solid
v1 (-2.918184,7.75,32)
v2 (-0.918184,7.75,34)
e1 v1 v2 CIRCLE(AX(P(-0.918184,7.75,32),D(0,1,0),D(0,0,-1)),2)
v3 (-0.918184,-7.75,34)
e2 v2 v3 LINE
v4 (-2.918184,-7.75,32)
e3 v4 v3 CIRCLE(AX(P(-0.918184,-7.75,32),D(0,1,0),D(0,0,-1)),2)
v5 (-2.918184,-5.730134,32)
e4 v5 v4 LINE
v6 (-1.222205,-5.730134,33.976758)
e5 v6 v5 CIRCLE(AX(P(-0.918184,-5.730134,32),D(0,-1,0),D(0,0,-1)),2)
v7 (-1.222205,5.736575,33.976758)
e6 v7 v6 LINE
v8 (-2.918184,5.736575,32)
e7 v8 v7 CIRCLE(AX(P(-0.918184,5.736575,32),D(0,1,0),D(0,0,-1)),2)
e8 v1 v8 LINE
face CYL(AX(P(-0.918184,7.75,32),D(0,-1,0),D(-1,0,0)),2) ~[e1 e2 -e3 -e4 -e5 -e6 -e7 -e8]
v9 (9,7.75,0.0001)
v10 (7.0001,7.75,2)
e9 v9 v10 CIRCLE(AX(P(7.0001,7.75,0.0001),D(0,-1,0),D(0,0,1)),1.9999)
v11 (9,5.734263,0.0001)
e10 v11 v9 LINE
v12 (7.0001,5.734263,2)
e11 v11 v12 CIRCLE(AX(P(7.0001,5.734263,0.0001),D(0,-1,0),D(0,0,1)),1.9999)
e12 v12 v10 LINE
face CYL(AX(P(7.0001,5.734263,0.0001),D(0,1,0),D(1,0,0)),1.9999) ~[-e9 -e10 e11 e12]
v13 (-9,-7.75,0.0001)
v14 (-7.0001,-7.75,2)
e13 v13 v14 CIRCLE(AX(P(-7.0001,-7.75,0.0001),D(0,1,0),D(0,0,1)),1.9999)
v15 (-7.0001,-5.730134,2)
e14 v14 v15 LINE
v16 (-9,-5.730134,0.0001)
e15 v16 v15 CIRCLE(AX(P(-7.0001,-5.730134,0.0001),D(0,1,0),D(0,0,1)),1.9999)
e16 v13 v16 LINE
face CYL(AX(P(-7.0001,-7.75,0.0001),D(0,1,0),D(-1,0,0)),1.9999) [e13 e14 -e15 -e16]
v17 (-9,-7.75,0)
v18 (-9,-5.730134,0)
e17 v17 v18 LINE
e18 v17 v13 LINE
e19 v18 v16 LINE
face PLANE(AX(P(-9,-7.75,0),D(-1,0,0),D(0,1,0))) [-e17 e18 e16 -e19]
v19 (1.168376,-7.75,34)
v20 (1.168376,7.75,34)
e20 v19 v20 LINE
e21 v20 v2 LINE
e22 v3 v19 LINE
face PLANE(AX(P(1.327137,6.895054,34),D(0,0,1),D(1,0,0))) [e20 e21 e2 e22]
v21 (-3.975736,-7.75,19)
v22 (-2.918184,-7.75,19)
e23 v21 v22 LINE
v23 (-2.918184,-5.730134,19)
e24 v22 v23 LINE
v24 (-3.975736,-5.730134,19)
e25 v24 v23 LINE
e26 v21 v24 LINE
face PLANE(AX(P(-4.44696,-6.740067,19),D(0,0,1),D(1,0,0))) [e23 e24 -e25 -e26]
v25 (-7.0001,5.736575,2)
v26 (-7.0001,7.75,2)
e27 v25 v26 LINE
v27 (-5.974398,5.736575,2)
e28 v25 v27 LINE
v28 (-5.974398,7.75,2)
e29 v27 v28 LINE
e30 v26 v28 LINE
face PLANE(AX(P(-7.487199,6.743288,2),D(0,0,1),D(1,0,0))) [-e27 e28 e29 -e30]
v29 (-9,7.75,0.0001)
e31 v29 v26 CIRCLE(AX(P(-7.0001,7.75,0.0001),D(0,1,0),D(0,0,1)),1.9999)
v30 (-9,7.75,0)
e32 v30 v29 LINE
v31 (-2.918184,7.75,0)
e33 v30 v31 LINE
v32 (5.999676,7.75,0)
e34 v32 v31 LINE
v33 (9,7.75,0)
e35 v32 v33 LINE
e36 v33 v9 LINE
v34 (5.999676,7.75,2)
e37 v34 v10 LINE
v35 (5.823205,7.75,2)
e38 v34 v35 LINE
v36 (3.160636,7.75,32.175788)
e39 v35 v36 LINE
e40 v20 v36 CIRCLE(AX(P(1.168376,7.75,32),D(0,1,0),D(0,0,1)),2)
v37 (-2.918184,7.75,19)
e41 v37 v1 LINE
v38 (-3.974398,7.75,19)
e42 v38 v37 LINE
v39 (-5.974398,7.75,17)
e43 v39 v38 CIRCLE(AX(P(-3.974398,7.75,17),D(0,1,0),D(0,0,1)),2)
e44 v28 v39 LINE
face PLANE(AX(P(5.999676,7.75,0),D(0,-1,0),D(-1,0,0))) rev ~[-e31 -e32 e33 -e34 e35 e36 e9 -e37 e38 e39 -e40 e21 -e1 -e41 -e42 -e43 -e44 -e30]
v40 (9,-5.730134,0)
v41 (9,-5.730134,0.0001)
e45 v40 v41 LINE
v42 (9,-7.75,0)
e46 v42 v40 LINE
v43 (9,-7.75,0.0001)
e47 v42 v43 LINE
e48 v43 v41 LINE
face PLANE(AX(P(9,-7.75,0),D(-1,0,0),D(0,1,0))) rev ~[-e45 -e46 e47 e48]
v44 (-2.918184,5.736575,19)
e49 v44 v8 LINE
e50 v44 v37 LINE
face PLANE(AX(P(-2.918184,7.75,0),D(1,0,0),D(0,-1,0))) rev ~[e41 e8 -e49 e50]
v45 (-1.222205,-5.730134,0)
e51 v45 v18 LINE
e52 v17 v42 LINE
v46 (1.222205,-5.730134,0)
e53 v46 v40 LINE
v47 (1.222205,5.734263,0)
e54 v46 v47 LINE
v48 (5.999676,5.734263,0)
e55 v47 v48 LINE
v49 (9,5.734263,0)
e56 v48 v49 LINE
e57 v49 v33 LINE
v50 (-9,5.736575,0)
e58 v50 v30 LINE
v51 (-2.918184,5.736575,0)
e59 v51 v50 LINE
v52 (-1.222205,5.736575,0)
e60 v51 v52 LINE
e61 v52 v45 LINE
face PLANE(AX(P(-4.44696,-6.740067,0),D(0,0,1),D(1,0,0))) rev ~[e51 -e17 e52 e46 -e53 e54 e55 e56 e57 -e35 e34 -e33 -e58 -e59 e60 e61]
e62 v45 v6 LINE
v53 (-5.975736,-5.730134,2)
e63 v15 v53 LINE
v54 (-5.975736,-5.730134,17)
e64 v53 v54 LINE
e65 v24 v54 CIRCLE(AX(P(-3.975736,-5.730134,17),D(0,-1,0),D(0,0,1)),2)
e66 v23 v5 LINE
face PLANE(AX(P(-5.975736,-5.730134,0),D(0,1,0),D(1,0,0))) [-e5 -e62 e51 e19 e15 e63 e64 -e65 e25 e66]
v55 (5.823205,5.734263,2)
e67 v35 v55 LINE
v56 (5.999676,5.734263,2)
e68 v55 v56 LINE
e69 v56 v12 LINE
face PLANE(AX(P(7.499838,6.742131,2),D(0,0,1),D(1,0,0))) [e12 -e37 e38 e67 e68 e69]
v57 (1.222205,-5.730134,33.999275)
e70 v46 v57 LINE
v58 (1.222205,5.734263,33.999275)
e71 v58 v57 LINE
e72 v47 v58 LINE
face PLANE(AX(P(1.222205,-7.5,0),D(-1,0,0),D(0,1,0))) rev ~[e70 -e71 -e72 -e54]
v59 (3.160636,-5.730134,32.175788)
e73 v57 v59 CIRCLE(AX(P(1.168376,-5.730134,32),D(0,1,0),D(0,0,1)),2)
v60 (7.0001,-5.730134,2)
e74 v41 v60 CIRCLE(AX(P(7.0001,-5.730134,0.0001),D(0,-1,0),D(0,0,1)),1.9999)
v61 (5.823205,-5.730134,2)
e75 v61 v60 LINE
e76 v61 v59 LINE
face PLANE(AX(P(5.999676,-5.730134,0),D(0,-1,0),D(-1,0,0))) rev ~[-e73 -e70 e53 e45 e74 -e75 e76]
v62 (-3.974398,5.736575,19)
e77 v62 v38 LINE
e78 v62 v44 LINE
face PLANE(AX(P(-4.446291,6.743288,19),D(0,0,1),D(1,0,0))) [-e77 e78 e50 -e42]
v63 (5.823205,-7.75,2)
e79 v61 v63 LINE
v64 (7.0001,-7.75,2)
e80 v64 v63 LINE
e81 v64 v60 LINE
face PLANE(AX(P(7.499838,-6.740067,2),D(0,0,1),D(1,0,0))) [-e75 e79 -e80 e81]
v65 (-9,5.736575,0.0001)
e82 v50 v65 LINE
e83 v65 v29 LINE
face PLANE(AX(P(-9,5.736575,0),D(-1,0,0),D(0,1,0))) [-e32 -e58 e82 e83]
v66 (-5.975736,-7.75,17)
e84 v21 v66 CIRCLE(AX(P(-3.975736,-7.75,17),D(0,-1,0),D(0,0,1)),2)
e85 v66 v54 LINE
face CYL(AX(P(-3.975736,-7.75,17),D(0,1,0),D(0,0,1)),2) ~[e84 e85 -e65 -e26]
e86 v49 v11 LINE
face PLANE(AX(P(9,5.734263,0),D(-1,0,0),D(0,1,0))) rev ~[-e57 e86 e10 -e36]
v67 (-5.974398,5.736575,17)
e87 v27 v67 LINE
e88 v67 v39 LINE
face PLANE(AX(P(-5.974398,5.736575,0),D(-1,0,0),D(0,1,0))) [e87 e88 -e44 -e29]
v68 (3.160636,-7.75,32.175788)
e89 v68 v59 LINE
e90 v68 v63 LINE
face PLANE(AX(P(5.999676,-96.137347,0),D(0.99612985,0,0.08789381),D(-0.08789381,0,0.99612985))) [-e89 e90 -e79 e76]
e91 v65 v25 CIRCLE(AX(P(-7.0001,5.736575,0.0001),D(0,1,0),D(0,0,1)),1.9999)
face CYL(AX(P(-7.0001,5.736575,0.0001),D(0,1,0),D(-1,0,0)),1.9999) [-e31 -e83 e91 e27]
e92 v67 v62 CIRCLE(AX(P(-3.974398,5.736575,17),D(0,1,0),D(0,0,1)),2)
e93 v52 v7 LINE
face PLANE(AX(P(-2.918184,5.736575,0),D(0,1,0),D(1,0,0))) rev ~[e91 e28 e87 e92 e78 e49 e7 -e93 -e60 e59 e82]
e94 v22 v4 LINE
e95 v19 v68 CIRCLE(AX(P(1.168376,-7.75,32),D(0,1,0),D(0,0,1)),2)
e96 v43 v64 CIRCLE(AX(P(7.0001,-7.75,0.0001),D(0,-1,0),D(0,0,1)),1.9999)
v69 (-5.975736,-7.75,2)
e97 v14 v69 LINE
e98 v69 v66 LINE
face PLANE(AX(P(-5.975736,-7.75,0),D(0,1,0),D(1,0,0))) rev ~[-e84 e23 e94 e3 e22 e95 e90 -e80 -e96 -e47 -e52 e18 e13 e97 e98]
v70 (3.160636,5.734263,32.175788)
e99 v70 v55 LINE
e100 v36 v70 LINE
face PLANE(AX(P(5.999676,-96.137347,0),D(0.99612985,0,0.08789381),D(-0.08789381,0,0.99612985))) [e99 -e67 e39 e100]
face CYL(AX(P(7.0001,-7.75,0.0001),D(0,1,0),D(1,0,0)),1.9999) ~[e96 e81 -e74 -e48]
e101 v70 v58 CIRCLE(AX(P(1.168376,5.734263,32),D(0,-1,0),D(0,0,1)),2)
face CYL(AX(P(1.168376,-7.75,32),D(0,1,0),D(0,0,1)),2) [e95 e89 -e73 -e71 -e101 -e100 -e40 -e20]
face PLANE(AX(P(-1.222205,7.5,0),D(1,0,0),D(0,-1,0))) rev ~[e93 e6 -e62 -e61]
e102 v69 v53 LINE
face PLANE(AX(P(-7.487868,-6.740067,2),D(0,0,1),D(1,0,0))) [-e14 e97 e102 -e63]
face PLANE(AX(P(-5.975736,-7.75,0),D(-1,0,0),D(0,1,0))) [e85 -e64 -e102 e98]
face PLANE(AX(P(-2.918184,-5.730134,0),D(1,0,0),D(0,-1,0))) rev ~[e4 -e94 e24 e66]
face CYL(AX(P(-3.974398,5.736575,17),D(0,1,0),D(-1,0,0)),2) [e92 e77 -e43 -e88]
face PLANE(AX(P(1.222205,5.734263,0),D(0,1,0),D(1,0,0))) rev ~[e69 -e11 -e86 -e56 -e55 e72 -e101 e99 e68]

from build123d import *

# Parameters (mm, degrees)
F0_W        = 3.0256015398
F0_H        = 2.0134245381
F1_DEPTH    = 2
F0_W_2      = 3.0003240481
F0_H_2      = 2.0157374777
F0_H_3      = 2.019865565
F0_W_3      = 3.0242641605
F2_DEPTH    = 34
F3_DEPTH    = 34
F0_W_4      = 3.0575518031
F0_W_5      = 3.0562144239
F4_DEPTH    = 19
F5_T4_DEPTH = 178.7945589271
F5_T9_DEPTH = 178.7904308398
F7_F1_R     = 1.9999
F7_F2_R     = 1.9999
F7_F3_R     = 1.9999
F7_F4_R     = 1.9999
F7_F5_R     = 2
F7_F6_R     = 2
F7_F7_R     = 2
F8_F1_R     = 2


# Not quite as in the source:
# - a fillet or chamfer that OpenCascade refuses, or shapes differently, is made with other operations: its cross-section is extruded or revolved along the edge and cut away or added
# - two fillets or chamfers of one size are made in one step
# - a fillet or chamfer is up to 0.001 mm smaller than in the source, because OpenCascade refuses the exact size


with BuildPart() as f1:
    # F0 (on Top) → F1 (new body)
    with BuildSketch(Plane.XY):
        with Locations((-7.4871992301, 6.743287731)):
            Rectangle(F0_W, F0_H)
    extrude(amount=F1_DEPTH)



with BuildPart() as f1b:
    # F0 (on Top) → F1, piece 2 (new body)
    with BuildSketch(Plane.XY):
        with Locations((7.4998379759, 6.7421312612)):
            Rectangle(F0_W_2, F0_H_2)
    extrude(amount=F1_DEPTH)



with BuildPart() as f1c:
    # F0 (on Top) → F1, piece 3 (new body)
    with BuildSketch(Plane.XY):
        with Locations((7.4998379759, -6.7400672175)):
            Rectangle(F0_W_2, F0_H_3)
    extrude(amount=F1_DEPTH)


with BuildPart() as f1d:
    # F0 (on Top) → F1, piece 4 (new body)
    with BuildSketch(Plane.XY):
        with Locations((-7.4878679197, -6.7400672175)):
            Rectangle(F0_W_3, F0_H_3)
    extrude(amount=F1_DEPTH)


with BuildPart() as f2:
    # F0 (on Top) → F2 (new body)
    with BuildSketch(Plane.XY):
        Polygon((1.2222049991, -5.730134435), (1.2222049991, 5.7342625223), (1.2222049991, 7.5), (-1.2222049991, 7.5), (-1.2222049991, 5.7365754619), (-1.2222049991, -5.730134435), (-1.2222049991, -7.5), (1.2222049991, -7.5), align=None)
    extrude(amount=F2_DEPTH)


with BuildPart() as f1b_1:
    add(f1b.part)

    add(f1c.part)  # F3 merges F1c

    add(f2.part)  # F3 merges F2
    # F0 (on Top) → F3 (join)
    with BuildSketch(Plane.XY):
        Polygon((5.9996759519, 5.7342625223), (5.9996759519, 7.75), (-2.9181840364, 7.75), (-2.9181840364, 5.7365754619), (-1.2222049991, 5.7365754619), (-1.2222049991, 7.5), (1.2222049991, 7.5), (1.2222049991, 5.7342625223), align=None)
        Polygon((5.9996759519, -7.75), (5.9996759519, -5.730134435), (1.2222049991, -5.730134435), (1.2222049991, -7.5), (-1.2222049991, -7.5), (-1.2222049991, -5.730134435), (-2.9181840364, -5.730134435), (-2.9181840364, -7.75), align=None)
    extrude(amount=F3_DEPTH)


with BuildPart() as f1_1:
    add(f1.part)

    add(f1b_1.part)  # F4 merges F1b

    add(f1d.part)  # F4 merges F1d
    # F0 (on Top) → F4 (join)
    with BuildSketch(Plane.XY):
        with Locations((-4.4469599379, -6.7400672175)):
            Rectangle(F0_W_4, F0_H_3)
        with Locations((-4.4462912483, 6.743287731)):
            Rectangle(F0_W_5, F0_H)
    extrude(amount=F4_DEPTH)

    # F5: chamfer of 3 x 34 on 2 edges, made by hand


with BuildPart() as f5_tool2:
    # F5_s3 → F5_t4 (new body)
    with BuildSketch(Plane.XZ.offset(96.137346681)):
        Polygon((5.9996759519, 0), (2.9996759519, 34), (5.9996759519, 34), align=None)
    extrude(amount=-F5_T4_DEPTH)

    split(bisect_by=Plane.XY.offset(2), keep=Keep.TOP)


with BuildPart() as f1_2:
    add(f1_1.part)

    # F5_t1: cut F5_tool2
    add(f5_tool2.part, mode=Mode.SUBTRACT)


with BuildPart() as f5_tool7:
    # F5_s8 → F5_t9 (new body)
    with BuildSketch(Plane.XZ.offset(82.6530841587)):
        Polygon((5.9996759519, 0), (2.9996759519, 34), (5.9996759519, 34), align=None)
    extrude(amount=-F5_T9_DEPTH)

    split(bisect_by=Plane.XY.offset(2), keep=Keep.TOP)


with BuildPart() as f1_3:
    add(f1_2.part)

    # F5_t6: cut F5_tool7
    add(f5_tool7.part, mode=Mode.SUBTRACT)

    # F7: fillet of radius 2 on 8 edges, made by hand

    # F7_f1 (radius 2 in the source; OpenCascade refuses exactly that, so slightly less here)
    f7_f1_edges = [f1_3.edges().sort_by_distance(p)[0] for p in [
        (-9, -6.7400672175, 2),
    ]]
    fillet(f7_f1_edges, radius=F7_F1_R)

    # F7_f2 (radius 2 in the source; OpenCascade refuses exactly that, so slightly less here)
    f7_f2_edges = [f1_3.edges().sort_by_distance(p)[0] for p in [
        (9, -6.7400672175, 2),
    ]]
    fillet(f7_f2_edges, radius=F7_F2_R)

    # F7_f3 (radius 2 in the source; OpenCascade refuses exactly that, so slightly less here)
    f7_f3_edges = [f1_3.edges().sort_by_distance(p)[0] for p in [
        (9, 6.7421312612, 2),
    ]]
    fillet(f7_f3_edges, radius=F7_F3_R)

    # F7_f4 (radius 2 in the source; OpenCascade refuses exactly that, so slightly less here)
    f7_f4_edges = [f1_3.edges().sort_by_distance(p)[0] for p in [
        (-9, 6.743287731, 2),
    ]]
    fillet(f7_f4_edges, radius=F7_F4_R)

    # F7_f5
    f7_f5_edges = [f1_3.edges().sort_by_distance(p)[0] for p in [
        (-5.9743984602, 6.743287731, 19),
    ]]
    fillet(f7_f5_edges, radius=F7_F5_R)

    # F7_f6
    f7_f6_edges = [f1_3.edges().sort_by_distance(p)[0] for p in [
        (-2.9181840364, 6.743287731, 34),
    ]]
    fillet(f7_f6_edges, radius=F7_F6_R)

    # F7_f7
    f7_f7_edges = [f1_3.edges().sort_by_distance(p)[0] for p in [
        (-5.9757358395, -6.7400672175, 19),
    ]]
    fillet(f7_f7_edges, radius=F7_F7_R)

    # F8: fillet of radius 2 on 2 edges, made by hand

    # F8_f1
    f8_f1_edges = [f1_3.edges().sort_by_distance(p)[0] for p in [
        (2.9996759519, -6.7400672175, 34),
    ]]
    fillet(f8_f1_edges, radius=F8_F1_R)


solid = f1_3.part
